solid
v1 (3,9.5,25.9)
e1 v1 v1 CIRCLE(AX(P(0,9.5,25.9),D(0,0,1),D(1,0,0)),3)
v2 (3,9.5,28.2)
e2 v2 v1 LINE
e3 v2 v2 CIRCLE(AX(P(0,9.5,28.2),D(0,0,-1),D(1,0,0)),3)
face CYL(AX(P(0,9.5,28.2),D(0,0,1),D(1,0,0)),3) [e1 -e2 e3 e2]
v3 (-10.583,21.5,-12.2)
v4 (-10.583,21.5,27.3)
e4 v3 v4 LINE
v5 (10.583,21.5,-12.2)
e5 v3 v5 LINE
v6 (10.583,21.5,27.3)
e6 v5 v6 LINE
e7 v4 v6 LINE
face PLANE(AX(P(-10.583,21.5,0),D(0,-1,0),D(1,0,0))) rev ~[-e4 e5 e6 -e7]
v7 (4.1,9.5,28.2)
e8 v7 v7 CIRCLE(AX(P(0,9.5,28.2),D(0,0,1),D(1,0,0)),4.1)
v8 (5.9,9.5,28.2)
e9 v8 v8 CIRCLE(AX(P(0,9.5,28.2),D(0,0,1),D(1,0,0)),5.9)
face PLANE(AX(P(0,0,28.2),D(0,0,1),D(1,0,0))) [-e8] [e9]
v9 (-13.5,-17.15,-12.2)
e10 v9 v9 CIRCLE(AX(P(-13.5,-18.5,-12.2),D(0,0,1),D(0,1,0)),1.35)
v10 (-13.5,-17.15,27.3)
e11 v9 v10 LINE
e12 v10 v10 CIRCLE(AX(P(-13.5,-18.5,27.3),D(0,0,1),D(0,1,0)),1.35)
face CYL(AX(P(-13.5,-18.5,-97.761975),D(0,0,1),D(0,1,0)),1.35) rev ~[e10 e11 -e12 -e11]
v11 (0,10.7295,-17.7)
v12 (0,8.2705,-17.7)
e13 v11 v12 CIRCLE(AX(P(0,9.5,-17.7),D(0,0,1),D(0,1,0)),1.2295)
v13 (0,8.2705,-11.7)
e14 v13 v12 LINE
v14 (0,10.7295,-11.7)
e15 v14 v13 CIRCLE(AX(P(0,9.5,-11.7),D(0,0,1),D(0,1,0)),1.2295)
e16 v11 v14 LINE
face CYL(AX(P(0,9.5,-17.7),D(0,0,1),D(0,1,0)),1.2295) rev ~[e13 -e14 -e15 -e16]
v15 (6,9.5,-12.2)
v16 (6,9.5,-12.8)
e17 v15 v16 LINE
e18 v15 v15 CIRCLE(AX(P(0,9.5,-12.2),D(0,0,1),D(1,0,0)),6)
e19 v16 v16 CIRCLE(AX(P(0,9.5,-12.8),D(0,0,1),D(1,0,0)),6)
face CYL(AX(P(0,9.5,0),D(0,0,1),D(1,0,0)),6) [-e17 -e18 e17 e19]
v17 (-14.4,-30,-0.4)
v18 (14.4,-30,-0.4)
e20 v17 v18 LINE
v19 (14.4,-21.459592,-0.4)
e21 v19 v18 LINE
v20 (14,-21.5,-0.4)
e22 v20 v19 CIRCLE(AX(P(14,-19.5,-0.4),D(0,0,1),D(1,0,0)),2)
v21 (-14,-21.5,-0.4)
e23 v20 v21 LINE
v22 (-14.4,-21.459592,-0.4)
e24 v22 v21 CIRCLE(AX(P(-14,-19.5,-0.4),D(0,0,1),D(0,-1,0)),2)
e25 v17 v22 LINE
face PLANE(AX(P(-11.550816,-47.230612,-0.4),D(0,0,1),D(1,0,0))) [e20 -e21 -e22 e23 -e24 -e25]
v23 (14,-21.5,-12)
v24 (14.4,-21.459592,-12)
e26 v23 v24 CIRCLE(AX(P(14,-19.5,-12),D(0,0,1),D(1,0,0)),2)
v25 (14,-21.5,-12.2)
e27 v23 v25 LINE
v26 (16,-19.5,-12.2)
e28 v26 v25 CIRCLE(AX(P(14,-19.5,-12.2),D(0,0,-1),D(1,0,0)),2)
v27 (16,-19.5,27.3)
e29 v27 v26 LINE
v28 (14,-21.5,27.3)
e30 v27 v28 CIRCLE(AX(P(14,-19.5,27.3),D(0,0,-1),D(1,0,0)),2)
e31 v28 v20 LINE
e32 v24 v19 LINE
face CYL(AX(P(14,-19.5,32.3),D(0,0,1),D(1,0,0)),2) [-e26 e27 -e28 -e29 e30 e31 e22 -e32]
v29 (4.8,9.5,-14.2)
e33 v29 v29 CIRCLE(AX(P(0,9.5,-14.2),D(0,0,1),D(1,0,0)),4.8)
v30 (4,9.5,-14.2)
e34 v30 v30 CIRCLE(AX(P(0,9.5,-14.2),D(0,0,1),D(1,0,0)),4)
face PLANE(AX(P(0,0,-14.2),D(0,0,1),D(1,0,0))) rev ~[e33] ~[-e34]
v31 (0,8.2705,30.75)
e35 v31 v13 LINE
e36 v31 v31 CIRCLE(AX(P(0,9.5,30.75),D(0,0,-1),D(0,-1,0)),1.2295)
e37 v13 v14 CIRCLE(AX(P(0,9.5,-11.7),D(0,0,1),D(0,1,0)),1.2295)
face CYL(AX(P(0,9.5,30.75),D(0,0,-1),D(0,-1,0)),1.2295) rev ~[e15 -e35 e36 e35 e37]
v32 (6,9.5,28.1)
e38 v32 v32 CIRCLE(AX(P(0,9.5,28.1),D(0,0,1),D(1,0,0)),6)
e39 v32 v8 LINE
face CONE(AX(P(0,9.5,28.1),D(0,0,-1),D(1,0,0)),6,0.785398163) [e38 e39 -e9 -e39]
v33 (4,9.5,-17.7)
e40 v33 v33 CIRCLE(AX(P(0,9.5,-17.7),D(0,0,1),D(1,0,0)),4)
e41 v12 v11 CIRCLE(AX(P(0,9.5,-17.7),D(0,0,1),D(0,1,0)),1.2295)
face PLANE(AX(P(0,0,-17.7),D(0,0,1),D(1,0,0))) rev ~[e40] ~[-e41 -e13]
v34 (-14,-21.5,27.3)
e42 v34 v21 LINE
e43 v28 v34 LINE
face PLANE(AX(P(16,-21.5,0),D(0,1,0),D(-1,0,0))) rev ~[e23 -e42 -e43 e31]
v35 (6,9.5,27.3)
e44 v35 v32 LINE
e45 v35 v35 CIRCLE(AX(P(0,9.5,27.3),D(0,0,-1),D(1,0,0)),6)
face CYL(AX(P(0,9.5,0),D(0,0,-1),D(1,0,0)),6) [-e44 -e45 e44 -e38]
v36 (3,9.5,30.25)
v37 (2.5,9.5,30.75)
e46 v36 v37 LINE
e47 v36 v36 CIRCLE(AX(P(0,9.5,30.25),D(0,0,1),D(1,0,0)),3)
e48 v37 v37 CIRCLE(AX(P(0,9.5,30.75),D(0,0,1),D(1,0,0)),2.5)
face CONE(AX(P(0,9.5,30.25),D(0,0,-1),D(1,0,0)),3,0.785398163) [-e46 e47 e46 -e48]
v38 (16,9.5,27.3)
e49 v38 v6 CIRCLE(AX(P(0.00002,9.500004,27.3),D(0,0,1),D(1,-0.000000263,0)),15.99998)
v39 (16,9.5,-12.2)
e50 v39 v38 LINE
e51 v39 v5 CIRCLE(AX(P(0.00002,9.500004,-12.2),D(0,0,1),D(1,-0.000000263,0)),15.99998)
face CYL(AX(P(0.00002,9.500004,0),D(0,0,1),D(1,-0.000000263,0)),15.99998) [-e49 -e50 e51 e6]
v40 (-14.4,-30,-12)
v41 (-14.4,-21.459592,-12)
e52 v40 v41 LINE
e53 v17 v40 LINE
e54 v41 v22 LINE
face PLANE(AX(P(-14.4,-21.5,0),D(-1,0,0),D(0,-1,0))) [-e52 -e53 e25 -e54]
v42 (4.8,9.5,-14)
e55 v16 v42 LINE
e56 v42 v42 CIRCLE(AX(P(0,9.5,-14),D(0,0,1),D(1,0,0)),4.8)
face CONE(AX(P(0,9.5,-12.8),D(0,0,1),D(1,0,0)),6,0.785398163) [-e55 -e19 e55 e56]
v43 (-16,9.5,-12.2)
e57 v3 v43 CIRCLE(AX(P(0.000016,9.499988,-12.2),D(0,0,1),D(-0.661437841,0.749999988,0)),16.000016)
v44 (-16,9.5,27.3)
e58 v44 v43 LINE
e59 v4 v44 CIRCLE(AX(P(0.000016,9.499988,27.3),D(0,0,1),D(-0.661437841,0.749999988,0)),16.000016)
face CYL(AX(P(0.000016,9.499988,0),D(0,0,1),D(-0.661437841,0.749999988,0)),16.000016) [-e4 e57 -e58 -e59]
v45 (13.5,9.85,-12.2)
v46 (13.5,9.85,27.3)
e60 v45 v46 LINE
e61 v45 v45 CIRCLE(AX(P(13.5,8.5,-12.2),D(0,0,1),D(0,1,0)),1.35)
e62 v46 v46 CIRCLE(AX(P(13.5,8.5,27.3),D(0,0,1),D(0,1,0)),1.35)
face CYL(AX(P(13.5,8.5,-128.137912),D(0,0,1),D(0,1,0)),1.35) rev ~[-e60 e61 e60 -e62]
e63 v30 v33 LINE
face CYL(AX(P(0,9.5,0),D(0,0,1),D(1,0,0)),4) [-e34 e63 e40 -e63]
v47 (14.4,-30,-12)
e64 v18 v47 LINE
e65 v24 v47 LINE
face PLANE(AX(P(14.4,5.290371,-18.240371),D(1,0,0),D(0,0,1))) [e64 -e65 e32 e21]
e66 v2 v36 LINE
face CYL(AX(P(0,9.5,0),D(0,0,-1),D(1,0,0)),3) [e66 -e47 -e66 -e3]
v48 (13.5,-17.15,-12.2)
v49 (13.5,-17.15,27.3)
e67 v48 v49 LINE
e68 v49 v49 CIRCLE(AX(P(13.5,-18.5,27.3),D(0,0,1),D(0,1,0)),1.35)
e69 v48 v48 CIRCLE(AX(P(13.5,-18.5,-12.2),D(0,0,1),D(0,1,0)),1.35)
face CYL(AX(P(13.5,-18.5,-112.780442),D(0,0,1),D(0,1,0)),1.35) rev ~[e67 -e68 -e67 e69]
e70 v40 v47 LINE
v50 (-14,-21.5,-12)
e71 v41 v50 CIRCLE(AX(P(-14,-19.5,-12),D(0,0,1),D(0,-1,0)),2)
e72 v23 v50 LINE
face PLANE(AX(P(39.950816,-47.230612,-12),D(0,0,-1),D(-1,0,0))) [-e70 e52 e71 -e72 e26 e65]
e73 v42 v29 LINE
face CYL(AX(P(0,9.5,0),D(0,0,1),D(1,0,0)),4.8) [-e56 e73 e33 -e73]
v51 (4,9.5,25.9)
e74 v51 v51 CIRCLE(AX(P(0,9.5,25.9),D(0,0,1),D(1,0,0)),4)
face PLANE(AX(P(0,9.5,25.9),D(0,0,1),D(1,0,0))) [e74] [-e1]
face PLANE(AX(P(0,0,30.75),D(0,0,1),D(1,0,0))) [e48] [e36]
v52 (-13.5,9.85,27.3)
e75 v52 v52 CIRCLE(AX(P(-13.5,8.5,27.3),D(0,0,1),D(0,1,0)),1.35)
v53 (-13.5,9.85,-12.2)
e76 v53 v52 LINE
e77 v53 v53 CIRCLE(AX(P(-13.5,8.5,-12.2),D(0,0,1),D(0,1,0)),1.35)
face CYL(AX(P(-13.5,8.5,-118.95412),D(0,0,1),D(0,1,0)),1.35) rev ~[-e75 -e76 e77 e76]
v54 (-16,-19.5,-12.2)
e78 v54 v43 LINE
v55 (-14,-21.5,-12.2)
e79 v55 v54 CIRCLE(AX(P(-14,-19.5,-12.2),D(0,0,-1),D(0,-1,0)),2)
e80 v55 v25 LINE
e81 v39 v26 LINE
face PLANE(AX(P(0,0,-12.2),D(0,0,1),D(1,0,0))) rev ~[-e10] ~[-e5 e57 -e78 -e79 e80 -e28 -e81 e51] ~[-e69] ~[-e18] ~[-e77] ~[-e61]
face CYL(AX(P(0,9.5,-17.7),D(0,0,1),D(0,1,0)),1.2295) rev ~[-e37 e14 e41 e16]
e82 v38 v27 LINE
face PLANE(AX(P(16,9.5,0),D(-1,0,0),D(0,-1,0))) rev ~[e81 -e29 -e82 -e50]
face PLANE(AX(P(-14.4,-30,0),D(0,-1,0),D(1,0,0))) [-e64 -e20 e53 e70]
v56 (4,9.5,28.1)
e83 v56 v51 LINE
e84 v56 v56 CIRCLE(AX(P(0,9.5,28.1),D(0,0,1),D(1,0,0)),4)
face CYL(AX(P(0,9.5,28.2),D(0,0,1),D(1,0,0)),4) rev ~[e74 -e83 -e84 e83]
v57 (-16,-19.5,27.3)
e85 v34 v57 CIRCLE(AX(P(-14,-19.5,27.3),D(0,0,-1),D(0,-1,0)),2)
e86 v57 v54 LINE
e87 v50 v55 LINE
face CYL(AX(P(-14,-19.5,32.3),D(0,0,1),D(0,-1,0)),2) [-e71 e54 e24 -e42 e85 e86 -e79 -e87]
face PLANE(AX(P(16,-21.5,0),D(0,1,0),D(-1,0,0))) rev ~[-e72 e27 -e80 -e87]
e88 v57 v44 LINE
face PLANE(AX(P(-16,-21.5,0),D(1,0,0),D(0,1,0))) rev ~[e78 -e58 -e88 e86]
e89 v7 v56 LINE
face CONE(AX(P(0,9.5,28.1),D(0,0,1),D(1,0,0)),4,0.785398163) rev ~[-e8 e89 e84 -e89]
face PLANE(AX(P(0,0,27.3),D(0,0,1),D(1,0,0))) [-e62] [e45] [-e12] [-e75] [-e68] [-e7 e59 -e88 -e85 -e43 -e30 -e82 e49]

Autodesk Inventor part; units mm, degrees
ref_plane "YZ Plane" through (0, 0, 0) normal (1, 0, 0) x (0, 1, 0)
ref_plane "XZ Plane" through (0, 0, 0) normal (0, 1, 0) x (-1, 0, 0)
ref_plane "XY Plane" through (0, 0, 0) normal (0, 0, 1) x (1, 0, 0)
sketch "スケッチ1" plane through (0, 0, 0) normal (0, 0, 1) x (1, 0, 0)
  line L0 (-16, 21.5) -> (-10.583, 21.5) construction
  line L1 (16, 21.5) -> (16, 9.5) construction
  line L2 (16, -21.5) -> (-16, -21.5)
  line L3 (-16, -21.5) -> (-16, 9.5)
  line L4 (-16, 21.5) -> (16, -21.5) construction
  line L5 (16, 21.5) -> (-16, -21.5) construction
  line L6 (-14.4, -21.5) -> (-14.4, -30)
  line L7 (-14.4, -30) -> (14.4, -30)
  line L8 (0, 21.5) -> (0, -21.5) construction
  line L9 (14.4, -21.5) -> (14.4, -30)
  line L10 (-13.5, 21.5) -> (-13.5, -21.5) construction
  circle A0 centre (0, 9.5) radius 6
  circle A1 centre (0, 9.5) radius 4
  arc A2 (-10.583, 21.5) -> (-16, 9.5) centre (0, 9.5) ccw
  arc A3 (16, 9.5) -> (10.583, 21.5) centre (0, 9.5) ccw
  line L11 (-10.583, 21.5) -> (10.583, 21.5)
  line L12 (-16, 9.5) -> (-16, 21.5) construction
  line L13 (10.583, 21.5) -> (16, 21.5) construction
  line L14 (16, 9.5) -> (16, -21.5)
  circle A4 centre (0, 9.5) radius 3
  circle A5 centre (0, 9.5) radius 4.8
  point P0 (0, 0)
  point P1 (-13.5, 8.5)
  point P2 (-13.5, -18.5)
  point P3 (13.5, 8.5)
  point P4 (13.5, -18.5)
  dimension "d0" = 32
  dimension "d1" = 43
  dimension "d4" = 28.8
  dimension "d5" = 8.5
  dimension "d8" = 27
  dimension "d9" = 8.5
  dimension "d12" = 18.5
  dimension "d13" = 12
  dimension "d14" = 8
  dimension "d15" = 9.5
  dimension "d17" = 16
  dimension "d32" = 13.5
  dimension "d47" = 6
  dimension "d67" = 9.6
extrude "押し出し1" add sketch "スケッチ1" against normal blind 12.2 contours L2 L3 A2 L11 A3 L14 | A0 | A1 | A4 | A5
extrude "押し出し2" add sketch "スケッチ1" against normal blind 12 contours L9 L7 L6 L2
extrude "押し出し3" add sketch "スケッチ1" against normal blind 14 contours A0 | A1 | A4 | A5
extrude "押し出し4" add sketch "スケッチ1" against normal blind 17.7 contours A1 | A4
chamfer "面取り1" distance 1.2 angle 45 1 edges at (-6, 9.5, -14)
sketch "スケッチ2" plane through (0, 9.5, -17.7) normal (0, 0, -1) x (-1, 0, 0)
  circle A0 centre (0, 0) radius 4 projected
  point P0 (0, -9.5)
hole "穴1" at (0, 9.5, -17.7) direction (0, 0, 1) diameter 2.459 depth 6 thread size "M3x0.5" class "6H" standard "ANSI Metric M Profile"
extrude "押し出し5" add sketch "スケッチ1" along normal blind 27.3 contours L2 L3 A2 L11 A3 L14 | A0 | A1 | A4 | A5
hole "穴2" at (-13.5, 8.5, 0) at (-13.5, -18.5, 0) at (13.5, 8.5, 0) at (13.5, -18.5, 0) direction (0, 0, 1) diameter 2.7 end through all both
extrude "押し出し6" cut sketch "スケッチ1" against normal blind 0.4 contours L9 L7 L6 L2
fillet "フィレット1" radius 2 2 edges at (16, -21.5, 7.55) (-16, -21.5, 7.55)
extrude "押し出し7" add sketch "スケッチ1" along normal blind 28.2 contours A0 | A1 | A4 | A5
extrude "押し出し8" add sketch "スケッチ1" along normal blind 30.75 contours A4
sketch "スケッチ3" plane through (0, 9.5, 30.75) normal (0, 0, 1) x (1, 0, 0)
  circle A0 centre (0, 0) radius 1.2295 projected
  point P0 (0, -9.5)
hole "穴3" at (0, 9.5, 30.75) direction (0, 0, -1) diameter 2.459 end through all thread size "M3x0.5" class "6H" standard "ANSI Metric M Profile"
sketch "スケッチ4" plane through (0, 9.5, 28.2) normal (0, 0, 1) x (1, 0, 0)
  circle A0 centre (0, 0) radius 4
  circle A1 centre (0, 0) radius 3
  point P0 (0, -9.5)
extrude "押し出し9" cut sketch "スケッチ4" against normal blind 2.3
chamfer "面取り2" distance 0.5 angle 45 1 edges at (-3, 9.5, 30.75)
extrude "押し出し10" add sketch "スケッチ1" against normal blind 14.2 contours A5
chamfer "面取り4" distance 0.1 angle 45 2 edges at (-6, 9.5, 28.2) (-4, 9.5, 28.2)
properties part number "B3M-SC-1170-A"
